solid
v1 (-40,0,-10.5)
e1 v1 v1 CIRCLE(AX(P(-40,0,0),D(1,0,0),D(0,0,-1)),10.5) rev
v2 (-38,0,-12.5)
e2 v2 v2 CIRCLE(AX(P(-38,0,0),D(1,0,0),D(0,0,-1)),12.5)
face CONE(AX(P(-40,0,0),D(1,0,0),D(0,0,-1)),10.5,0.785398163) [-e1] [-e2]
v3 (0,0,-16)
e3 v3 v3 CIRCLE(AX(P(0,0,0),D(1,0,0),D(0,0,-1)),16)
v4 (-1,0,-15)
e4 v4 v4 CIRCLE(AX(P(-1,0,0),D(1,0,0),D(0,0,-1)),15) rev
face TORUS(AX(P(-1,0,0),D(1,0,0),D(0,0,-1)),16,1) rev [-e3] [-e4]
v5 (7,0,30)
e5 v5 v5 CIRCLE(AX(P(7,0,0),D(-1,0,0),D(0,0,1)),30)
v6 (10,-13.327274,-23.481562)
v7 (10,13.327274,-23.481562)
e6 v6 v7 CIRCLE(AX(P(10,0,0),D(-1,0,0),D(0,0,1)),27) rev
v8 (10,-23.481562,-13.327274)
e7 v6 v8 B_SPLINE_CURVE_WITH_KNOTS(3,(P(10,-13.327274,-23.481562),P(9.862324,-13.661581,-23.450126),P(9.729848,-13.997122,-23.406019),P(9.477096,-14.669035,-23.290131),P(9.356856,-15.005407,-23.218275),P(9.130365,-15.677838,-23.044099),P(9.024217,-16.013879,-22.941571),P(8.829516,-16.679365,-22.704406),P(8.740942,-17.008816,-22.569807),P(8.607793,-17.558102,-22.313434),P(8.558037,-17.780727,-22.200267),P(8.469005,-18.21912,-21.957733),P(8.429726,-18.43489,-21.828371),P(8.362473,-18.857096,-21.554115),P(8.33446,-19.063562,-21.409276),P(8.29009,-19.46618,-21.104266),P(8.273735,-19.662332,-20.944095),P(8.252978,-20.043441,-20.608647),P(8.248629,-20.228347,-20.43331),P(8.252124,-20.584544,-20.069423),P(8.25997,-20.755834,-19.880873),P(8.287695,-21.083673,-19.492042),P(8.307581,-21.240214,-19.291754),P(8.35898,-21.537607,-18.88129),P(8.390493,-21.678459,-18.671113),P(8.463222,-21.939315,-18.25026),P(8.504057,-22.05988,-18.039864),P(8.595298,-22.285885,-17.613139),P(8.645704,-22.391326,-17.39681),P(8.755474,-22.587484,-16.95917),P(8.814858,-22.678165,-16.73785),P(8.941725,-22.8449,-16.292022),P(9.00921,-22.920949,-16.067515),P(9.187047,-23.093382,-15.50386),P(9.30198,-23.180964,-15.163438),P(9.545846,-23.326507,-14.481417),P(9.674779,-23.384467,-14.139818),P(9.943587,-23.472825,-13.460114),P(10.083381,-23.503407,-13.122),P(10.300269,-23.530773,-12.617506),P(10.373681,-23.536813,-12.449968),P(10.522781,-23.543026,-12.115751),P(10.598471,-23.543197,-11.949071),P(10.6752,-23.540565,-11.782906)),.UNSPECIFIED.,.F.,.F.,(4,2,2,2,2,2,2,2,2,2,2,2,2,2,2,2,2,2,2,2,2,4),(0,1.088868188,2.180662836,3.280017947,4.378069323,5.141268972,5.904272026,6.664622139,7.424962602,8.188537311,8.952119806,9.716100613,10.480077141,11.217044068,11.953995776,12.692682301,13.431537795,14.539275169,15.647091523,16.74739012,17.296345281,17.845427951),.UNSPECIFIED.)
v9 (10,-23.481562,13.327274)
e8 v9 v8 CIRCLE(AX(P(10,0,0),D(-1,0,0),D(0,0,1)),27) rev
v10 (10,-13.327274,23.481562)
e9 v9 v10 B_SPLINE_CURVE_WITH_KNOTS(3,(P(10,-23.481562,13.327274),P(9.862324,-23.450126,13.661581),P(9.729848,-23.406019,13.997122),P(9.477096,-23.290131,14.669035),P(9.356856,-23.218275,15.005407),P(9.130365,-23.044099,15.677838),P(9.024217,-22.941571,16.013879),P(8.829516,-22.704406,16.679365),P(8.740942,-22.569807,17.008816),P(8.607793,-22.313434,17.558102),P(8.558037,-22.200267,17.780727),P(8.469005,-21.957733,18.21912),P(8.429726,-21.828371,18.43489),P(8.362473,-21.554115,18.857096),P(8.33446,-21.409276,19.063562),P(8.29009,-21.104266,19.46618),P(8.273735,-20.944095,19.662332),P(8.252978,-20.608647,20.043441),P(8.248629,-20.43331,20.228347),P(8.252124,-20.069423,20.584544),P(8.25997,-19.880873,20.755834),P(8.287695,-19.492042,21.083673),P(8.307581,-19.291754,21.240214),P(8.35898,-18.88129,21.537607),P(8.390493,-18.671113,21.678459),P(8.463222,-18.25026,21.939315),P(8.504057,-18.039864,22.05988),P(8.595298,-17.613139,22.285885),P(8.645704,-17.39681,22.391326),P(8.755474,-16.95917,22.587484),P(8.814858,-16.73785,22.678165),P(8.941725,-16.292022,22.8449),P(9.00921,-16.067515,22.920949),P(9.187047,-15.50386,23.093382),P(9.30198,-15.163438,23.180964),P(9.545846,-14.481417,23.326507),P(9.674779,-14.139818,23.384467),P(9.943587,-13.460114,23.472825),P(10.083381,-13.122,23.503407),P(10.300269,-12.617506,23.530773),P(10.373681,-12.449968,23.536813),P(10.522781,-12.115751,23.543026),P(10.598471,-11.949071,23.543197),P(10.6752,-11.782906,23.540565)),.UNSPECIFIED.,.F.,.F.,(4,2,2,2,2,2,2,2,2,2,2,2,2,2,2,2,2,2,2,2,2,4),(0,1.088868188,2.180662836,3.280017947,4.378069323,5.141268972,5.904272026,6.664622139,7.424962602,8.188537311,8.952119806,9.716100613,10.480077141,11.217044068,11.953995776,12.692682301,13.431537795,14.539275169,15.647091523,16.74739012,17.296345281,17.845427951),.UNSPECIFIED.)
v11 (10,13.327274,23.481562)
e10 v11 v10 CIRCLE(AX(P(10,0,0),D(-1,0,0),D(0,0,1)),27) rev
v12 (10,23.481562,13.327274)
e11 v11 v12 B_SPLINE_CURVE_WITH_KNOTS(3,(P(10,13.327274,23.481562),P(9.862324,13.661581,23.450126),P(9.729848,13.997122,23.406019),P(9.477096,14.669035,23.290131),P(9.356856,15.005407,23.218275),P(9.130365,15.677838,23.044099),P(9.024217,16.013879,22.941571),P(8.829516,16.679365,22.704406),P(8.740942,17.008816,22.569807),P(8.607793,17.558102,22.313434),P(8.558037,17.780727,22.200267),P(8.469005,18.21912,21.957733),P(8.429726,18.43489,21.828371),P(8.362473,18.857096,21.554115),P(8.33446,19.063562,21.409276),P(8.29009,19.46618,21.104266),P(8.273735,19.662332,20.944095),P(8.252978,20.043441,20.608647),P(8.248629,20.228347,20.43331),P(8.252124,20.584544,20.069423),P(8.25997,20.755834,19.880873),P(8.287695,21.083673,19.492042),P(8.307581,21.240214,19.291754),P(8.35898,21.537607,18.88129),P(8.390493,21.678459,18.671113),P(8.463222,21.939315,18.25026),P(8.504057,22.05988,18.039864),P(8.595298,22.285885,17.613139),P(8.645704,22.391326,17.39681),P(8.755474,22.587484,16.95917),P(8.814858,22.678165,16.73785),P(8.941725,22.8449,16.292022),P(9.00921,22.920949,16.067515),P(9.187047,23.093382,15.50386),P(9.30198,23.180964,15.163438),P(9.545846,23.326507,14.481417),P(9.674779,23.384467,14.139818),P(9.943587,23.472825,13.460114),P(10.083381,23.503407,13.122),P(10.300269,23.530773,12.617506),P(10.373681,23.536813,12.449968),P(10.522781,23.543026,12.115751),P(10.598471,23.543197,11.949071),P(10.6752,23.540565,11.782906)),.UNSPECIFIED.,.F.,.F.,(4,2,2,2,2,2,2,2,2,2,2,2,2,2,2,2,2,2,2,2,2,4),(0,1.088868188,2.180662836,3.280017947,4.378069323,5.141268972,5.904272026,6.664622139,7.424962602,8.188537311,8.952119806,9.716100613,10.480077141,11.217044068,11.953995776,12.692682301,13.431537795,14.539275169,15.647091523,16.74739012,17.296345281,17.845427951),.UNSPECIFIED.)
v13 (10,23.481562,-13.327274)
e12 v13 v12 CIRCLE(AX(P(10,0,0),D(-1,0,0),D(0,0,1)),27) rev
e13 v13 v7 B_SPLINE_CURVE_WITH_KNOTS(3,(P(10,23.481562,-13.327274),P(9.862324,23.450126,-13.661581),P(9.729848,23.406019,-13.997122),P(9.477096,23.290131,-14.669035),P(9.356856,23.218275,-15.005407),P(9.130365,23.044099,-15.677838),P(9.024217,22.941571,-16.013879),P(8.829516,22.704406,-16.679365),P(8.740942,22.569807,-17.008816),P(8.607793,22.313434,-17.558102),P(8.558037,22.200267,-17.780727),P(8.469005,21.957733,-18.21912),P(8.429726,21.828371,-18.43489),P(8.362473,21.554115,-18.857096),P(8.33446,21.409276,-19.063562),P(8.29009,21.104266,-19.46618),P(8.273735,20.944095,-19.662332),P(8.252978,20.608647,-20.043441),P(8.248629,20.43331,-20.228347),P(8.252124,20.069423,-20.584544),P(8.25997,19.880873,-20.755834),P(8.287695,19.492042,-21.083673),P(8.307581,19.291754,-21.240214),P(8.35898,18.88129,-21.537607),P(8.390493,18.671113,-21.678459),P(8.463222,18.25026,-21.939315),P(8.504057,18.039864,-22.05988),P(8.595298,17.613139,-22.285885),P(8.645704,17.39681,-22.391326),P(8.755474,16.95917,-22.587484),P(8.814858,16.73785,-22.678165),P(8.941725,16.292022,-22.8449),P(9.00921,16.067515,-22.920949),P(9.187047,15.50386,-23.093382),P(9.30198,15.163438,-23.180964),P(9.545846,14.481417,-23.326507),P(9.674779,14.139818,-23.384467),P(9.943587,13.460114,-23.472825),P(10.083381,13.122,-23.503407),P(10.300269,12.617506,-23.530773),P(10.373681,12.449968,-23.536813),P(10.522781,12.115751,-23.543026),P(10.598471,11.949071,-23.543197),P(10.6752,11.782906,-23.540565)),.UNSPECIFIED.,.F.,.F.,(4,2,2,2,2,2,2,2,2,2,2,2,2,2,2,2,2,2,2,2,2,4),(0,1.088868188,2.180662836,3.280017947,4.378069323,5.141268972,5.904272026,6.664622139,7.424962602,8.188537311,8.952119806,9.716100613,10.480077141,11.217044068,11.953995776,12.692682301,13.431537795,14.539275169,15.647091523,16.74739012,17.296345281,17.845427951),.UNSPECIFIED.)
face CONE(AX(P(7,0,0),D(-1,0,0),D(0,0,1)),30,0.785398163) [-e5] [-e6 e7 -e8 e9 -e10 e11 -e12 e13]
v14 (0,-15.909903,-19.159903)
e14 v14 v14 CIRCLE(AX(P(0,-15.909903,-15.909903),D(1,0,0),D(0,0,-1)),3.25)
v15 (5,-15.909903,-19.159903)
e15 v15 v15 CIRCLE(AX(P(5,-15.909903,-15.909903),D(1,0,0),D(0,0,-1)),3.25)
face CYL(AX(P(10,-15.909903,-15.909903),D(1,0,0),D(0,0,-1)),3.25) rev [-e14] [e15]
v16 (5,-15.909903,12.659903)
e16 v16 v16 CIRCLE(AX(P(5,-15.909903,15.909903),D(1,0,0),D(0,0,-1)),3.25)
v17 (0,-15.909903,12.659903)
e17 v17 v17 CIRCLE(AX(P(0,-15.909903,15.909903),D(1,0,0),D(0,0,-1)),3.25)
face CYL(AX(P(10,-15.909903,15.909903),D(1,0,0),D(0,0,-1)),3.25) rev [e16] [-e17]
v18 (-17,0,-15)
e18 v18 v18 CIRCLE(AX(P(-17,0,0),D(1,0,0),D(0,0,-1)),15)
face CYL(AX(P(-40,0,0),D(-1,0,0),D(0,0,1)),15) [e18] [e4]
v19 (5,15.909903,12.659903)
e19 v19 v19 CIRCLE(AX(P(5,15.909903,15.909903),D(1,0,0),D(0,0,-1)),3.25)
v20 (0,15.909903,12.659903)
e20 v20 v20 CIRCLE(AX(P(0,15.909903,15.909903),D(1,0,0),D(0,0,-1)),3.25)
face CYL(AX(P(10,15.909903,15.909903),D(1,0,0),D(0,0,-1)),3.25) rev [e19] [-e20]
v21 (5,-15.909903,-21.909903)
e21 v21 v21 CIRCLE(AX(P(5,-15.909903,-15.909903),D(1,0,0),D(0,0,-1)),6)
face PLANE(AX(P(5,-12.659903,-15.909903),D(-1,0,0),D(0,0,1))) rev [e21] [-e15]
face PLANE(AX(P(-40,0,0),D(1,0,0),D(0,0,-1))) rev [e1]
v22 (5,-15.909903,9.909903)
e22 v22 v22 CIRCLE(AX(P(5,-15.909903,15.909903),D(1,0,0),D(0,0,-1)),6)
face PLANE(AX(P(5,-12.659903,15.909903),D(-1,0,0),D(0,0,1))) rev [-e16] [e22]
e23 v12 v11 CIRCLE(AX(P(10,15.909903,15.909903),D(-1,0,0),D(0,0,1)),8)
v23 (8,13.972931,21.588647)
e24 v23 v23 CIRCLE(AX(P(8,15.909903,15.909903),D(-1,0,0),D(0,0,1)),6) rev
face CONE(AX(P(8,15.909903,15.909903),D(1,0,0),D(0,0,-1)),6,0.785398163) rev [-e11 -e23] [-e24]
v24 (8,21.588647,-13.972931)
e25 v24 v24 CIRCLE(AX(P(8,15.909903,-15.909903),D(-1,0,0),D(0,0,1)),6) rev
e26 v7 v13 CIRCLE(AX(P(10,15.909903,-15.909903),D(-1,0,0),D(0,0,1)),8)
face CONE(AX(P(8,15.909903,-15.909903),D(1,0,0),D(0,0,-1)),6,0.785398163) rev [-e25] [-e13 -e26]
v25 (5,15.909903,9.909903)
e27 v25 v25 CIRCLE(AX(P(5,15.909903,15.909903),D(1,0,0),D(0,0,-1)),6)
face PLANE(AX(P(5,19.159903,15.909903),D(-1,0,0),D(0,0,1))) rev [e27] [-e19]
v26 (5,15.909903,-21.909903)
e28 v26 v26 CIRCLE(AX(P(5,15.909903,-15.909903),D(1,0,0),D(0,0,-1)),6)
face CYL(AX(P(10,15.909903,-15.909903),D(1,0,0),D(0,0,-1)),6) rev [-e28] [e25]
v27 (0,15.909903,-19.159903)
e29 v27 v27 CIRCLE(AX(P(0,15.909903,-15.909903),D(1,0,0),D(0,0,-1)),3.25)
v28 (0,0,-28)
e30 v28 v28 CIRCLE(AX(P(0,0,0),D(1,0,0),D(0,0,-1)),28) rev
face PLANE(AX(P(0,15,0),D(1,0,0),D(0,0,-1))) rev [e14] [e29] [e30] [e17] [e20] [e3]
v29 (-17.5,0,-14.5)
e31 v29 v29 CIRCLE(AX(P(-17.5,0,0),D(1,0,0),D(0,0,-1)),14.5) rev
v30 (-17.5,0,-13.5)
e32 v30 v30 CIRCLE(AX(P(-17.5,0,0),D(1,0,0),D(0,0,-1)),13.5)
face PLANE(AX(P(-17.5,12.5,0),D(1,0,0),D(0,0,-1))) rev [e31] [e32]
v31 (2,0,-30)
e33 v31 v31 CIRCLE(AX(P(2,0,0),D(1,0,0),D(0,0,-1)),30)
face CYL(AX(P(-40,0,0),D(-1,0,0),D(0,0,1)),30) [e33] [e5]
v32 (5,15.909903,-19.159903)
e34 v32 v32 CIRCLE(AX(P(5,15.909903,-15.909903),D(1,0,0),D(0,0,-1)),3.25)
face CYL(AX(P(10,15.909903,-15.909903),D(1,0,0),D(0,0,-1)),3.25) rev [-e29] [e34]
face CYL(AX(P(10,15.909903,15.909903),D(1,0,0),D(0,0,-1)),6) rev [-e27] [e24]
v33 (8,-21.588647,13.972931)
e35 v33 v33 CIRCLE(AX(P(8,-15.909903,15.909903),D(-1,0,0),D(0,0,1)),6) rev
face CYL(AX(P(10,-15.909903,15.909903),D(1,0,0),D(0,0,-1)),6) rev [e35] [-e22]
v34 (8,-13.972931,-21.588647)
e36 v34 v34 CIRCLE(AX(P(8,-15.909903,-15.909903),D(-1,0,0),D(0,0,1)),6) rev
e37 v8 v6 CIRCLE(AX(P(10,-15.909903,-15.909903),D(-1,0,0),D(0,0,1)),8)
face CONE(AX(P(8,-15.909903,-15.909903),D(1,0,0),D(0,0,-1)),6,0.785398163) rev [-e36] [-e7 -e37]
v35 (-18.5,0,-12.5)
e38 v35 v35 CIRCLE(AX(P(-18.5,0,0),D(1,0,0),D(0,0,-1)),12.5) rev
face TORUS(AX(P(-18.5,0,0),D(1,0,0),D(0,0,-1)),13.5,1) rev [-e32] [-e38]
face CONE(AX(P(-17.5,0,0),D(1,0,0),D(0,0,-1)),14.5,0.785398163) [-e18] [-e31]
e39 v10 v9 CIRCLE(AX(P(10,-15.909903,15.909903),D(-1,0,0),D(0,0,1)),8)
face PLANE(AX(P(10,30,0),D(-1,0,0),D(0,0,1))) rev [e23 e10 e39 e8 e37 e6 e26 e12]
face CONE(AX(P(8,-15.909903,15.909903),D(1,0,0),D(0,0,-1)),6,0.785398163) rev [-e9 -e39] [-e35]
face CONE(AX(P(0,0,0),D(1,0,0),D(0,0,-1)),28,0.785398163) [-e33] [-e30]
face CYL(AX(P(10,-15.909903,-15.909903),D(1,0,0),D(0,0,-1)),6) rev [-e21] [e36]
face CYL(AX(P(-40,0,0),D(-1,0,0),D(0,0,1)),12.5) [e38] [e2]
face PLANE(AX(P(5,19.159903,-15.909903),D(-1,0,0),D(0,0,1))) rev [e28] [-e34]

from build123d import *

# Parameters (mm, degrees)
CHAMFER1_SIZE     = 2
FILLET1_R         = 1
CHAMFER2_SIZE     = 0.5
FILLET2_R         = 1
CHAMFER3_SIZE     = 2
CHAMFER4_SIZE     = 3
HOLE1_D           = 6.5
HOLE1_CBORE_D     = 12
HOLE1_CBORE_DEPTH = 5
CIRPATTERN1_COUNT = 4


with BuildPart() as part:
    # Sketch1 → Revolve1 (revolve)
    with BuildSketch(Plane.XY, mode=Mode.PRIVATE) as revolve1_sk:
        Polygon((-40, 0), (-40, 12.5), (-17.5, 12.5), (-17.5, 15), (0, 15), (0, 30), (10, 30), (10, 0), align=None)
    revolve(revolve1_sk.sketch.rotate(Axis((-40, 0, 0), (1, 0, 0)), 90), axis=Axis((-40, 0, 0), (1, 0, 0)))

    # Chamfer1
    chamfer1_edges = [part.edges().sort_by_distance(p)[0] for p in [
        (-40, 0, -12.5),
    ]]
    chamfer(chamfer1_edges, length=CHAMFER1_SIZE)

    # Fillet1
    fillet1_edges = [part.edges().sort_by_distance(p)[0] for p in [
        (-17.5, 0, -12.5),
    ]]
    fillet(fillet1_edges, radius=FILLET1_R)

    # Chamfer2
    chamfer2_edges = [part.edges().sort_by_distance(p)[0] for p in [
        (-17.5, 0, -15),
    ]]
    chamfer(chamfer2_edges, length=CHAMFER2_SIZE)

    # Fillet2
    fillet2_edges = [part.edges().sort_by_distance(p)[0] for p in [
        (0, 0, -15),
    ]]
    fillet(fillet2_edges, radius=FILLET2_R)

    # Chamfer3
    chamfer3_edges = [part.edges().sort_by_distance(p)[0] for p in [
        (0, 0, -30),
    ]]
    chamfer(chamfer3_edges, length=CHAMFER3_SIZE)

    # Chamfer4
    chamfer4_edges = [part.edges().sort_by_distance(p)[0] for p in [
        (10, 0, -30),
    ]]
    chamfer(chamfer4_edges, length=CHAMFER4_SIZE)

    # Hole1 (through all)
    with Locations(Plane(origin=(10, 0, 0), x_dir=(0, 0, -1), z_dir=(1, 0, 0))):
        with Locations((15.909902577, 15.909902577)):
            hole1 = CounterBoreHole(HOLE1_D / 2, HOLE1_CBORE_D / 2, HOLE1_CBORE_DEPTH)

    # CirPattern1: Hole1 ×4 about axis
    cirpattern1_axis = Axis((0, 0, 0), (1, 0, 0))
    for i in range(1, CIRPATTERN1_COUNT):
        add(hole1.rotate(cirpattern1_axis, i * 360 / CIRPATTERN1_COUNT), mode=Mode.SUBTRACT)

    # Chamfer5: read off the stored shape, not the designer's step
    # Chamfer5: loft between two sections, ruled curve by curve
    chamfer5_from = [
        Edge.make_three_point_arc((8, -21.588647326, 13.972931211), (8, -13.972931211, 10.231157827), (8, -10.231157827, 17.846873942)),
        Edge.make_three_point_arc((8, -10.231157827, 17.846873942), (8, -17.846873942, 21.588647326), (8, -21.588647326, 13.972931211)),
    ]
    chamfer5_to = [
        Edge.make_three_point_arc((10.000000095, -23.481562332, 13.327274059), (10.000000095, -13.327274059, 8.338242821), (10.000000095, -8.338242821, 18.492531095)),
        Edge.make_three_point_arc((10.000000095, -8.338242821, 18.492531095), (10.000000095, -18.492531095, 23.481562332), (10.000000095, -23.481562332, 13.327274059)),
    ]
    chamfer5 = Solid(Shell([*[Face.make_surface_from_curves(chamfer5_from[k], chamfer5_to[k]) for k in range(2)], Face(Wire(chamfer5_from)), Face(Wire(chamfer5_to))]))
    add(chamfer5, mode=Mode.SUBTRACT)

    # Chamfer5 2: loft between two sections, ruled curve by curve
    chamfer5_2_from = [
        Edge.make_three_point_arc((8, -13.972931211, -21.588647326), (8, -10.231157827, -13.972931211), (8, -17.846873942, -10.231157827)),
        Edge.make_three_point_arc((8, -17.846873942, -10.231157827), (8, -21.588647326, -17.846873942), (8, -13.972931211, -21.588647326)),
    ]
    chamfer5_2_to = [
        Edge.make_three_point_arc((10.000000095, -13.327274059, -23.481562332), (10.000000095, -8.338242821, -13.327274059), (10.000000095, -18.492531095, -8.338242821)),
        Edge.make_three_point_arc((10.000000095, -18.492531095, -8.338242821), (10.000000095, -23.481562332, -18.492531095), (10.000000095, -13.327274059, -23.481562332)),
    ]
    chamfer5_2 = Solid(Shell([*[Face.make_surface_from_curves(chamfer5_2_from[k], chamfer5_2_to[k]) for k in range(2)], Face(Wire(chamfer5_2_from)), Face(Wire(chamfer5_2_to))]))
    add(chamfer5_2, mode=Mode.SUBTRACT)

    # Chamfer5 3: loft between two sections, ruled curve by curve
    chamfer5_3_from = [
        Edge.make_three_point_arc((8, 21.588647326, -13.972931211), (8, 13.972931211, -10.231157827), (8, 10.231157827, -17.846873942)),
        Edge.make_three_point_arc((8, 10.231157827, -17.846873942), (8, 17.846873942, -21.588647326), (8, 21.588647326, -13.972931211)),
    ]
    chamfer5_3_to = [
        Edge.make_three_point_arc((10.000000095, 23.481562332, -13.327274059), (10.000000095, 13.327274059, -8.338242821), (10.000000095, 8.338242821, -18.492531095)),
        Edge.make_three_point_arc((10.000000095, 8.338242821, -18.492531095), (10.000000095, 18.492531095, -23.481562332), (10.000000095, 23.481562332, -13.327274059)),
    ]
    chamfer5_3 = Solid(Shell([*[Face.make_surface_from_curves(chamfer5_3_from[k], chamfer5_3_to[k]) for k in range(2)], Face(Wire(chamfer5_3_from)), Face(Wire(chamfer5_3_to))]))
    add(chamfer5_3, mode=Mode.SUBTRACT)

    # Chamfer5 4: loft between two sections, ruled curve by curve
    chamfer5_4_from = [
        Edge.make_three_point_arc((8, 13.972931211, 21.588647326), (8, 10.231157827, 13.972931211), (8, 17.846873942, 10.231157827)),
        Edge.make_three_point_arc((8, 17.846873942, 10.231157827), (8, 21.588647326, 17.846873942), (8, 13.972931211, 21.588647326)),
    ]
    chamfer5_4_to = [
        Edge.make_three_point_arc((10.000000095, 13.327274059, 23.481562332), (10.000000095, 8.338242821, 13.327274059), (10.000000095, 18.492531095, 8.338242821)),
        Edge.make_three_point_arc((10.000000095, 18.492531095, 8.338242821), (10.000000095, 23.481562332, 18.492531095), (10.000000095, 13.327274059, 23.481562332)),
    ]
    chamfer5_4 = Solid(Shell([*[Face.make_surface_from_curves(chamfer5_4_from[k], chamfer5_4_to[k]) for k in range(2)], Face(Wire(chamfer5_4_from)), Face(Wire(chamfer5_4_to))]))
    add(chamfer5_4, mode=Mode.SUBTRACT)


solid = part.part
